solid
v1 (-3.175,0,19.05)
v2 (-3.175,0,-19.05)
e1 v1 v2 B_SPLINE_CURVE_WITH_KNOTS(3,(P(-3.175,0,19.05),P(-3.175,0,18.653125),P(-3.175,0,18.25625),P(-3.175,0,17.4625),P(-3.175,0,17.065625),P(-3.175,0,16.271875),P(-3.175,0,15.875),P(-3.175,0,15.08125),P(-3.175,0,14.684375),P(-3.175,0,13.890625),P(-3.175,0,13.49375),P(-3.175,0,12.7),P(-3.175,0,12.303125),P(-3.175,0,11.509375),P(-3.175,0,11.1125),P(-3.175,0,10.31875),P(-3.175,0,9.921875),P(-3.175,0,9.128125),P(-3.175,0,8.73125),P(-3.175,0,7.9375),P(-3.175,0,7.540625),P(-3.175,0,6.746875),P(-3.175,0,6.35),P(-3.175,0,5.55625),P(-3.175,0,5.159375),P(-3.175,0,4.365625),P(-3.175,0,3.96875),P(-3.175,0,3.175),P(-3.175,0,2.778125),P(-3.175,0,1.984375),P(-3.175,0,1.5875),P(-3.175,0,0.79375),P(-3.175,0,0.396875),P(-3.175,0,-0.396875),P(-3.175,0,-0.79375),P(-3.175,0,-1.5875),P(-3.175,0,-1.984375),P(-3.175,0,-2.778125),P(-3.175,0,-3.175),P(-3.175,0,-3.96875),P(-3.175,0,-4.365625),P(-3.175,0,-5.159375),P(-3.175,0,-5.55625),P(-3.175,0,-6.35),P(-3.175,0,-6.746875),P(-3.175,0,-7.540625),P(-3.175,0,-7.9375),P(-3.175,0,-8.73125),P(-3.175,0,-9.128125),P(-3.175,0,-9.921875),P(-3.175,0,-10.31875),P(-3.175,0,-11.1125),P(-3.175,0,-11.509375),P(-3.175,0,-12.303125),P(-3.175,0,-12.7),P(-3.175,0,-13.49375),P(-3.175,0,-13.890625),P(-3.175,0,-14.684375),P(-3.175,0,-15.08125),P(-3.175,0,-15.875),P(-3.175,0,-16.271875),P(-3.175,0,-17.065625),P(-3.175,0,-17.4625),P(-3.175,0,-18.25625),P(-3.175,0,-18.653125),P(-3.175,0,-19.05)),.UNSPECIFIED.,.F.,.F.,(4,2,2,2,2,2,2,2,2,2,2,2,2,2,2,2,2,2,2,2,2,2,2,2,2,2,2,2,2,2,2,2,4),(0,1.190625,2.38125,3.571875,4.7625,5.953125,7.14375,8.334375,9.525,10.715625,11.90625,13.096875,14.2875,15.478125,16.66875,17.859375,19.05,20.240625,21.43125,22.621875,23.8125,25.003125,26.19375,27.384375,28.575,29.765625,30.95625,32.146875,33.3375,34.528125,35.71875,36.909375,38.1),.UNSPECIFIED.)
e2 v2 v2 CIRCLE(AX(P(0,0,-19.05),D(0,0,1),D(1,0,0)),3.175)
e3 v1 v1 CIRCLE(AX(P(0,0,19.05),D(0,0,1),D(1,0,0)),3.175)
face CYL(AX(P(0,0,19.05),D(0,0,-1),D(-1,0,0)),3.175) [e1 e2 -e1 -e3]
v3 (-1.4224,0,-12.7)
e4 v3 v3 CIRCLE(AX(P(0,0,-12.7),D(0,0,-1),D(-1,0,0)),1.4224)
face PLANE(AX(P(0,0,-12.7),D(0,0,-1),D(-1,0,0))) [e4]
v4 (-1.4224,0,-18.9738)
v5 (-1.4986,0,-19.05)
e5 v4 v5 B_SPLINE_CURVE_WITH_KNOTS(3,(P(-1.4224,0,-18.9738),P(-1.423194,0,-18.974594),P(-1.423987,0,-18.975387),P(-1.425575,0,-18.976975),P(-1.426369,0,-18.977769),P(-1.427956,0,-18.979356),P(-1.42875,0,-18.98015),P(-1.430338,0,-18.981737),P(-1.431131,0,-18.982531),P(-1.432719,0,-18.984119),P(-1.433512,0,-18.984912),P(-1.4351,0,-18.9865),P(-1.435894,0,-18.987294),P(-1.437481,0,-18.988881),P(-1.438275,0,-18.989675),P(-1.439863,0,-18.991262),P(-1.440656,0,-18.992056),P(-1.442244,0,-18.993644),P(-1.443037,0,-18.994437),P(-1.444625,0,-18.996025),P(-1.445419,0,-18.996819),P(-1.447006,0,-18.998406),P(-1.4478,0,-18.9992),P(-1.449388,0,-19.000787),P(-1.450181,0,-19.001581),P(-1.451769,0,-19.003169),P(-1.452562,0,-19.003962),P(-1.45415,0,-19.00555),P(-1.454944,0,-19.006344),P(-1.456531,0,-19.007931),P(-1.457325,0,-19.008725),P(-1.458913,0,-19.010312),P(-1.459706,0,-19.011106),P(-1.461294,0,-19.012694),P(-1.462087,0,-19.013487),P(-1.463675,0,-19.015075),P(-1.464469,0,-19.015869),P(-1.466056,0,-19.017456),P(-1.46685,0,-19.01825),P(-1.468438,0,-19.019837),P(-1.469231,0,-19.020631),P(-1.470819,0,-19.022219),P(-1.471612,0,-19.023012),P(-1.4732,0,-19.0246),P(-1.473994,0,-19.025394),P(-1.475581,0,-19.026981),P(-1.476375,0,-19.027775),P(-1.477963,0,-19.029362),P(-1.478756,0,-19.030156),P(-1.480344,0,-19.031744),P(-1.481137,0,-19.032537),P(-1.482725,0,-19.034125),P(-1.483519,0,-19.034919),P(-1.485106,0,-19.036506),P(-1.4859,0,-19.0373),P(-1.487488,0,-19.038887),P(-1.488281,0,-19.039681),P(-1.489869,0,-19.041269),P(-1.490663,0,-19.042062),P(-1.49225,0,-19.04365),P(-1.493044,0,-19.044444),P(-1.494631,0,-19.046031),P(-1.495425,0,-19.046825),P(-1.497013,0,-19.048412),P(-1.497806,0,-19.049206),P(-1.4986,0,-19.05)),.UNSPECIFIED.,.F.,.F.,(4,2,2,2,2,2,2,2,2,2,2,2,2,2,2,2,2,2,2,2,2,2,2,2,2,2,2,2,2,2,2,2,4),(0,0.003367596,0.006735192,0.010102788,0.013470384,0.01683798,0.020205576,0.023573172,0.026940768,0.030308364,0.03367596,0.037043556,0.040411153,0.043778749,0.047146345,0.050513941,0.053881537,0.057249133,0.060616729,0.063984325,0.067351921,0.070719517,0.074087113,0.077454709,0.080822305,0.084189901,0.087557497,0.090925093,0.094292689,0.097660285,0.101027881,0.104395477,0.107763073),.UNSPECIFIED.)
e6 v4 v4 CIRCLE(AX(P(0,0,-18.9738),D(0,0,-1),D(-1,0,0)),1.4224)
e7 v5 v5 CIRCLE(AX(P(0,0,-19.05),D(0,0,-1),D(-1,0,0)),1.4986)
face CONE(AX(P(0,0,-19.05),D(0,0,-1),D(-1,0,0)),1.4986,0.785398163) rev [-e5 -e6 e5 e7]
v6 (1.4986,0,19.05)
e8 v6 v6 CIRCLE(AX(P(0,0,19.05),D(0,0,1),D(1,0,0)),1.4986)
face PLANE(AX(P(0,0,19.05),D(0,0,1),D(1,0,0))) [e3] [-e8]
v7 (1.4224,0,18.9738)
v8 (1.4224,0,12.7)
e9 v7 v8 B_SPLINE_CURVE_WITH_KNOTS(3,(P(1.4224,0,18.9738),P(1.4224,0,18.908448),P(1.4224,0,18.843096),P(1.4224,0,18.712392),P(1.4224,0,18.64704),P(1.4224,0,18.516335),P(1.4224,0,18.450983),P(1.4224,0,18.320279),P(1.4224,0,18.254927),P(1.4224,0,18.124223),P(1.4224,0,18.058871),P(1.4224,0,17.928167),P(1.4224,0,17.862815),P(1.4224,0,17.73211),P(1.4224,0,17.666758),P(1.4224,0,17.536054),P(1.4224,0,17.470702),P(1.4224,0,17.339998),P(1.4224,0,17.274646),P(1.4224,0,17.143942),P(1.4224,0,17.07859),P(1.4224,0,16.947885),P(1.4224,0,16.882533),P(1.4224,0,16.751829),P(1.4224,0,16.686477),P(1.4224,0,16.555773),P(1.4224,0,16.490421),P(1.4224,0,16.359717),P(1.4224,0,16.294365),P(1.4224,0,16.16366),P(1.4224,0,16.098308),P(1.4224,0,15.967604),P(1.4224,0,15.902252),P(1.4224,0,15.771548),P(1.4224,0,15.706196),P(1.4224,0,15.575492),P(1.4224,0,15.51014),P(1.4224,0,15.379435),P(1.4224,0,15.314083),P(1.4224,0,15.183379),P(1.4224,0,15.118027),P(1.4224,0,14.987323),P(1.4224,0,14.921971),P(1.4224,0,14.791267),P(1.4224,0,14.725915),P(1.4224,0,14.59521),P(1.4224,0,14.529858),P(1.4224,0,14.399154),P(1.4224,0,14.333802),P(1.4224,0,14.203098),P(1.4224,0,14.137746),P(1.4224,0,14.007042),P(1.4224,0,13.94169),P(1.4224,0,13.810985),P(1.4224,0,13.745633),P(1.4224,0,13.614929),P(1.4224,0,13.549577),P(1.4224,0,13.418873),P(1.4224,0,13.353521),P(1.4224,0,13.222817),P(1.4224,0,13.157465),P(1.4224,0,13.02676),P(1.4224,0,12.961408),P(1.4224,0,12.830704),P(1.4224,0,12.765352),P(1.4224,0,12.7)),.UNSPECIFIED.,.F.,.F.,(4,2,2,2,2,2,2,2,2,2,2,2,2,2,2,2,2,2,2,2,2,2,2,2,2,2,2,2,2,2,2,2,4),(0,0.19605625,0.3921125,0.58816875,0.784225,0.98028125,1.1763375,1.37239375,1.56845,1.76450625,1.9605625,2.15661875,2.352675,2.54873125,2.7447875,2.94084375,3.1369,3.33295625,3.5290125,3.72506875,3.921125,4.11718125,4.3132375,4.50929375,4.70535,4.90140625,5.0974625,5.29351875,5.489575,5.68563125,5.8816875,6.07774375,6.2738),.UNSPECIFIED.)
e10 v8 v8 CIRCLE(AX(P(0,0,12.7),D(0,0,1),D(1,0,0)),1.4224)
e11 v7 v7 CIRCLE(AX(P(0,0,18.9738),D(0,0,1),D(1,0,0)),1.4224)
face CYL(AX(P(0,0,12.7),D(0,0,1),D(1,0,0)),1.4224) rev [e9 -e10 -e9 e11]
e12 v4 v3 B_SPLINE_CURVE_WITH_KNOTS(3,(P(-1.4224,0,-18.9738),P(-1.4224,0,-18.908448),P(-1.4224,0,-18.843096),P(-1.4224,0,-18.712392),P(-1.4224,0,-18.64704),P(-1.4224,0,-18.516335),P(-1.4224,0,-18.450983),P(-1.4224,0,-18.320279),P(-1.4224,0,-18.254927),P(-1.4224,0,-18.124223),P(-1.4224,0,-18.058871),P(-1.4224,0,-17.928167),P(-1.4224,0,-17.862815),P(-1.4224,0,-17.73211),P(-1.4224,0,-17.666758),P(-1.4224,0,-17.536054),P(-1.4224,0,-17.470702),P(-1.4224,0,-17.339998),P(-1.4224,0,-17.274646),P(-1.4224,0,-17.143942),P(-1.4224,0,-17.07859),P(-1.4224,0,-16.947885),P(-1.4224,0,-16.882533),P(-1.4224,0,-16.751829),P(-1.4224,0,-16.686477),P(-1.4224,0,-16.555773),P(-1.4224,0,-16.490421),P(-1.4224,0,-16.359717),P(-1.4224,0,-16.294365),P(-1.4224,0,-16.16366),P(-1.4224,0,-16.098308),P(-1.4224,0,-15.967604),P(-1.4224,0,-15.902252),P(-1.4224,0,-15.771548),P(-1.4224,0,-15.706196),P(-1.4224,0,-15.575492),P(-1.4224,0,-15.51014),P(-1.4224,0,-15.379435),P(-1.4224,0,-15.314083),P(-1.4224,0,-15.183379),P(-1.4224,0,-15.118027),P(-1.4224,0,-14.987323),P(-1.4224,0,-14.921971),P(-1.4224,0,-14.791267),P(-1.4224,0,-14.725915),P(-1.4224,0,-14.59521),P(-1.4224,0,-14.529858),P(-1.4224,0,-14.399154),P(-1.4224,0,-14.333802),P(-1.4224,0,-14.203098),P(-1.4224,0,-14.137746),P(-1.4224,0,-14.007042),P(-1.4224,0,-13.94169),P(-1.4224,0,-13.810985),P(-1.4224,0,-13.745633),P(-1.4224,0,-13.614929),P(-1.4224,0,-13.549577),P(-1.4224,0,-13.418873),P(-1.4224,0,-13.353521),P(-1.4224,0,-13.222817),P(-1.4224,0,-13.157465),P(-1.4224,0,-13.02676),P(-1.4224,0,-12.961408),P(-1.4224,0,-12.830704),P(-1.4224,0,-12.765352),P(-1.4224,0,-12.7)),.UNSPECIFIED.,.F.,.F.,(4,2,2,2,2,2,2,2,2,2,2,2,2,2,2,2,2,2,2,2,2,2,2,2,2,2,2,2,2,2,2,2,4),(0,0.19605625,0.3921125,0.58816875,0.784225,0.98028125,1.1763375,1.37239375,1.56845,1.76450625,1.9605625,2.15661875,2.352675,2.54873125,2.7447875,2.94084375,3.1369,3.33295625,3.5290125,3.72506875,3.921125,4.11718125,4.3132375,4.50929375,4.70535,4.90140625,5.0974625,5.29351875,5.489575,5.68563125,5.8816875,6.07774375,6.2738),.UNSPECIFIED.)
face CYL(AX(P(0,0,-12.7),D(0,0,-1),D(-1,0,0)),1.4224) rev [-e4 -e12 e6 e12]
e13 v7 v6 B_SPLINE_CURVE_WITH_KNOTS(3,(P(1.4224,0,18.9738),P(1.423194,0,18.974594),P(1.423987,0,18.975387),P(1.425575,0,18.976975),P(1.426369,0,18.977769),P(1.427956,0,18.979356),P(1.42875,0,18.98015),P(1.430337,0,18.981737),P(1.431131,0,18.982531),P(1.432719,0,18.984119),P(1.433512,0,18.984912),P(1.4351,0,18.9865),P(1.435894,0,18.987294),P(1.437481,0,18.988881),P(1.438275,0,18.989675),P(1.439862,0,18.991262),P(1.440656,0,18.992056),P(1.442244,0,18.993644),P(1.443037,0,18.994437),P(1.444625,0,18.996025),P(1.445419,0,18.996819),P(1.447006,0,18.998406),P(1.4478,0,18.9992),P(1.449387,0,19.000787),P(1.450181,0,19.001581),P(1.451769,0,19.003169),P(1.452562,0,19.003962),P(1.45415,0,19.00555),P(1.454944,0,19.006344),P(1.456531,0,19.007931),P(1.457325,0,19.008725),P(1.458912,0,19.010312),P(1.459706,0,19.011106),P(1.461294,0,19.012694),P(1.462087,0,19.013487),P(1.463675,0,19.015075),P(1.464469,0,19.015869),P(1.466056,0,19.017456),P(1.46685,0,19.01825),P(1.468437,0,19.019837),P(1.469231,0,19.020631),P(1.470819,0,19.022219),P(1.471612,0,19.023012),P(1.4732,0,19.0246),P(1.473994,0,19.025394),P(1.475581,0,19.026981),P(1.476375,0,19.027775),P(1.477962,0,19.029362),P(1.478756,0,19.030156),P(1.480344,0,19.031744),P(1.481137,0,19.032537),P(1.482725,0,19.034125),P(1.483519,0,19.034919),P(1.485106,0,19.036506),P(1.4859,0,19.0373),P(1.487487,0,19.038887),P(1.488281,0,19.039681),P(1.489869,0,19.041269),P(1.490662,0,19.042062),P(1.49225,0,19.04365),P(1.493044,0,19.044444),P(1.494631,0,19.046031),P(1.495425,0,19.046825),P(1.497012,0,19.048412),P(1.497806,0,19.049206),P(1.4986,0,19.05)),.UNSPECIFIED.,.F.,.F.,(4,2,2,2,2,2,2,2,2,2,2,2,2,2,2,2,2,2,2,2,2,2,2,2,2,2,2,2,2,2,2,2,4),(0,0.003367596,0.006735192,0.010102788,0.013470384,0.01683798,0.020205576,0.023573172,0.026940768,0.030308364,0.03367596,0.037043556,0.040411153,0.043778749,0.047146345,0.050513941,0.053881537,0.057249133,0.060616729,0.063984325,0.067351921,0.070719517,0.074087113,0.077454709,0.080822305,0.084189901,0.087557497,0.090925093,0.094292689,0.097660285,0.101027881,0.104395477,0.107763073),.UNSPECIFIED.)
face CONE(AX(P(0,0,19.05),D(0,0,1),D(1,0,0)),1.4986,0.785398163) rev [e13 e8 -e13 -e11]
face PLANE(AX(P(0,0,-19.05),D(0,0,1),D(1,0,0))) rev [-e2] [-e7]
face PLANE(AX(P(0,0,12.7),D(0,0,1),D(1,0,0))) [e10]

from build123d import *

# Parameters (mm, degrees)
BOSS_EXTRUDE1_START = 19.05
SKETCH13_R          = 1.4224
BOSS_EXTRUDE1_DEPTH = 6.35
CIRPATTERN1_COUNT   = 2
CIRPATTERN1_ANGLE   = 180
EXTRUDE1_DEPTH      = 19.05
EXTRUDE1_DEPTH_BACK = 19.05
SKETCH1_R           = 3.175


# Read off the part's stored shape, not the designer's step: Boss-Extrude2
with BuildPart() as part:
    # Sketch13 → Boss-Extrude1 (new body)
    with BuildSketch(Plane.XY.offset(BOSS_EXTRUDE1_START)):
        Circle(SKETCH13_R)
    extrude(amount=-BOSS_EXTRUDE1_DEPTH)

    # Boss-Extrude2 outline → Boss-Extrude2 (revolve)
    with BuildSketch(Plane.XZ):
        Polygon((1.4224, 19.05), (1.4224, 18.9738), (1.4986, 19.05), align=None)
    revolve(axis=Axis((0, 0, 0), (0, 0, 1)))


with BuildPart() as cirpattern1_1:
    # CirPattern1: pattern copy
    add(part.part.rotate(Axis((0, 3.175, 0), (0, -1, 0)), 1 * CIRPATTERN1_ANGLE / (CIRPATTERN1_COUNT - 1)))


with BuildPart() as body_3:
    # Sketch1 → Extrude1 (new, two sides: drawn at the far end of the back side and taken through both)
    with BuildSketch(Plane.XY.offset(-EXTRUDE1_DEPTH_BACK)):
        with Locations(Location((0, 0, 0), (0, 0, 180))):
            Circle(SKETCH1_R)
    extrude(amount=EXTRUDE1_DEPTH + EXTRUDE1_DEPTH_BACK)

    # Combine1: cut CirPattern1_1, part
    add(cirpattern1_1.part, mode=Mode.SUBTRACT)
    add(part.part, mode=Mode.SUBTRACT)


solid = body_3.part
